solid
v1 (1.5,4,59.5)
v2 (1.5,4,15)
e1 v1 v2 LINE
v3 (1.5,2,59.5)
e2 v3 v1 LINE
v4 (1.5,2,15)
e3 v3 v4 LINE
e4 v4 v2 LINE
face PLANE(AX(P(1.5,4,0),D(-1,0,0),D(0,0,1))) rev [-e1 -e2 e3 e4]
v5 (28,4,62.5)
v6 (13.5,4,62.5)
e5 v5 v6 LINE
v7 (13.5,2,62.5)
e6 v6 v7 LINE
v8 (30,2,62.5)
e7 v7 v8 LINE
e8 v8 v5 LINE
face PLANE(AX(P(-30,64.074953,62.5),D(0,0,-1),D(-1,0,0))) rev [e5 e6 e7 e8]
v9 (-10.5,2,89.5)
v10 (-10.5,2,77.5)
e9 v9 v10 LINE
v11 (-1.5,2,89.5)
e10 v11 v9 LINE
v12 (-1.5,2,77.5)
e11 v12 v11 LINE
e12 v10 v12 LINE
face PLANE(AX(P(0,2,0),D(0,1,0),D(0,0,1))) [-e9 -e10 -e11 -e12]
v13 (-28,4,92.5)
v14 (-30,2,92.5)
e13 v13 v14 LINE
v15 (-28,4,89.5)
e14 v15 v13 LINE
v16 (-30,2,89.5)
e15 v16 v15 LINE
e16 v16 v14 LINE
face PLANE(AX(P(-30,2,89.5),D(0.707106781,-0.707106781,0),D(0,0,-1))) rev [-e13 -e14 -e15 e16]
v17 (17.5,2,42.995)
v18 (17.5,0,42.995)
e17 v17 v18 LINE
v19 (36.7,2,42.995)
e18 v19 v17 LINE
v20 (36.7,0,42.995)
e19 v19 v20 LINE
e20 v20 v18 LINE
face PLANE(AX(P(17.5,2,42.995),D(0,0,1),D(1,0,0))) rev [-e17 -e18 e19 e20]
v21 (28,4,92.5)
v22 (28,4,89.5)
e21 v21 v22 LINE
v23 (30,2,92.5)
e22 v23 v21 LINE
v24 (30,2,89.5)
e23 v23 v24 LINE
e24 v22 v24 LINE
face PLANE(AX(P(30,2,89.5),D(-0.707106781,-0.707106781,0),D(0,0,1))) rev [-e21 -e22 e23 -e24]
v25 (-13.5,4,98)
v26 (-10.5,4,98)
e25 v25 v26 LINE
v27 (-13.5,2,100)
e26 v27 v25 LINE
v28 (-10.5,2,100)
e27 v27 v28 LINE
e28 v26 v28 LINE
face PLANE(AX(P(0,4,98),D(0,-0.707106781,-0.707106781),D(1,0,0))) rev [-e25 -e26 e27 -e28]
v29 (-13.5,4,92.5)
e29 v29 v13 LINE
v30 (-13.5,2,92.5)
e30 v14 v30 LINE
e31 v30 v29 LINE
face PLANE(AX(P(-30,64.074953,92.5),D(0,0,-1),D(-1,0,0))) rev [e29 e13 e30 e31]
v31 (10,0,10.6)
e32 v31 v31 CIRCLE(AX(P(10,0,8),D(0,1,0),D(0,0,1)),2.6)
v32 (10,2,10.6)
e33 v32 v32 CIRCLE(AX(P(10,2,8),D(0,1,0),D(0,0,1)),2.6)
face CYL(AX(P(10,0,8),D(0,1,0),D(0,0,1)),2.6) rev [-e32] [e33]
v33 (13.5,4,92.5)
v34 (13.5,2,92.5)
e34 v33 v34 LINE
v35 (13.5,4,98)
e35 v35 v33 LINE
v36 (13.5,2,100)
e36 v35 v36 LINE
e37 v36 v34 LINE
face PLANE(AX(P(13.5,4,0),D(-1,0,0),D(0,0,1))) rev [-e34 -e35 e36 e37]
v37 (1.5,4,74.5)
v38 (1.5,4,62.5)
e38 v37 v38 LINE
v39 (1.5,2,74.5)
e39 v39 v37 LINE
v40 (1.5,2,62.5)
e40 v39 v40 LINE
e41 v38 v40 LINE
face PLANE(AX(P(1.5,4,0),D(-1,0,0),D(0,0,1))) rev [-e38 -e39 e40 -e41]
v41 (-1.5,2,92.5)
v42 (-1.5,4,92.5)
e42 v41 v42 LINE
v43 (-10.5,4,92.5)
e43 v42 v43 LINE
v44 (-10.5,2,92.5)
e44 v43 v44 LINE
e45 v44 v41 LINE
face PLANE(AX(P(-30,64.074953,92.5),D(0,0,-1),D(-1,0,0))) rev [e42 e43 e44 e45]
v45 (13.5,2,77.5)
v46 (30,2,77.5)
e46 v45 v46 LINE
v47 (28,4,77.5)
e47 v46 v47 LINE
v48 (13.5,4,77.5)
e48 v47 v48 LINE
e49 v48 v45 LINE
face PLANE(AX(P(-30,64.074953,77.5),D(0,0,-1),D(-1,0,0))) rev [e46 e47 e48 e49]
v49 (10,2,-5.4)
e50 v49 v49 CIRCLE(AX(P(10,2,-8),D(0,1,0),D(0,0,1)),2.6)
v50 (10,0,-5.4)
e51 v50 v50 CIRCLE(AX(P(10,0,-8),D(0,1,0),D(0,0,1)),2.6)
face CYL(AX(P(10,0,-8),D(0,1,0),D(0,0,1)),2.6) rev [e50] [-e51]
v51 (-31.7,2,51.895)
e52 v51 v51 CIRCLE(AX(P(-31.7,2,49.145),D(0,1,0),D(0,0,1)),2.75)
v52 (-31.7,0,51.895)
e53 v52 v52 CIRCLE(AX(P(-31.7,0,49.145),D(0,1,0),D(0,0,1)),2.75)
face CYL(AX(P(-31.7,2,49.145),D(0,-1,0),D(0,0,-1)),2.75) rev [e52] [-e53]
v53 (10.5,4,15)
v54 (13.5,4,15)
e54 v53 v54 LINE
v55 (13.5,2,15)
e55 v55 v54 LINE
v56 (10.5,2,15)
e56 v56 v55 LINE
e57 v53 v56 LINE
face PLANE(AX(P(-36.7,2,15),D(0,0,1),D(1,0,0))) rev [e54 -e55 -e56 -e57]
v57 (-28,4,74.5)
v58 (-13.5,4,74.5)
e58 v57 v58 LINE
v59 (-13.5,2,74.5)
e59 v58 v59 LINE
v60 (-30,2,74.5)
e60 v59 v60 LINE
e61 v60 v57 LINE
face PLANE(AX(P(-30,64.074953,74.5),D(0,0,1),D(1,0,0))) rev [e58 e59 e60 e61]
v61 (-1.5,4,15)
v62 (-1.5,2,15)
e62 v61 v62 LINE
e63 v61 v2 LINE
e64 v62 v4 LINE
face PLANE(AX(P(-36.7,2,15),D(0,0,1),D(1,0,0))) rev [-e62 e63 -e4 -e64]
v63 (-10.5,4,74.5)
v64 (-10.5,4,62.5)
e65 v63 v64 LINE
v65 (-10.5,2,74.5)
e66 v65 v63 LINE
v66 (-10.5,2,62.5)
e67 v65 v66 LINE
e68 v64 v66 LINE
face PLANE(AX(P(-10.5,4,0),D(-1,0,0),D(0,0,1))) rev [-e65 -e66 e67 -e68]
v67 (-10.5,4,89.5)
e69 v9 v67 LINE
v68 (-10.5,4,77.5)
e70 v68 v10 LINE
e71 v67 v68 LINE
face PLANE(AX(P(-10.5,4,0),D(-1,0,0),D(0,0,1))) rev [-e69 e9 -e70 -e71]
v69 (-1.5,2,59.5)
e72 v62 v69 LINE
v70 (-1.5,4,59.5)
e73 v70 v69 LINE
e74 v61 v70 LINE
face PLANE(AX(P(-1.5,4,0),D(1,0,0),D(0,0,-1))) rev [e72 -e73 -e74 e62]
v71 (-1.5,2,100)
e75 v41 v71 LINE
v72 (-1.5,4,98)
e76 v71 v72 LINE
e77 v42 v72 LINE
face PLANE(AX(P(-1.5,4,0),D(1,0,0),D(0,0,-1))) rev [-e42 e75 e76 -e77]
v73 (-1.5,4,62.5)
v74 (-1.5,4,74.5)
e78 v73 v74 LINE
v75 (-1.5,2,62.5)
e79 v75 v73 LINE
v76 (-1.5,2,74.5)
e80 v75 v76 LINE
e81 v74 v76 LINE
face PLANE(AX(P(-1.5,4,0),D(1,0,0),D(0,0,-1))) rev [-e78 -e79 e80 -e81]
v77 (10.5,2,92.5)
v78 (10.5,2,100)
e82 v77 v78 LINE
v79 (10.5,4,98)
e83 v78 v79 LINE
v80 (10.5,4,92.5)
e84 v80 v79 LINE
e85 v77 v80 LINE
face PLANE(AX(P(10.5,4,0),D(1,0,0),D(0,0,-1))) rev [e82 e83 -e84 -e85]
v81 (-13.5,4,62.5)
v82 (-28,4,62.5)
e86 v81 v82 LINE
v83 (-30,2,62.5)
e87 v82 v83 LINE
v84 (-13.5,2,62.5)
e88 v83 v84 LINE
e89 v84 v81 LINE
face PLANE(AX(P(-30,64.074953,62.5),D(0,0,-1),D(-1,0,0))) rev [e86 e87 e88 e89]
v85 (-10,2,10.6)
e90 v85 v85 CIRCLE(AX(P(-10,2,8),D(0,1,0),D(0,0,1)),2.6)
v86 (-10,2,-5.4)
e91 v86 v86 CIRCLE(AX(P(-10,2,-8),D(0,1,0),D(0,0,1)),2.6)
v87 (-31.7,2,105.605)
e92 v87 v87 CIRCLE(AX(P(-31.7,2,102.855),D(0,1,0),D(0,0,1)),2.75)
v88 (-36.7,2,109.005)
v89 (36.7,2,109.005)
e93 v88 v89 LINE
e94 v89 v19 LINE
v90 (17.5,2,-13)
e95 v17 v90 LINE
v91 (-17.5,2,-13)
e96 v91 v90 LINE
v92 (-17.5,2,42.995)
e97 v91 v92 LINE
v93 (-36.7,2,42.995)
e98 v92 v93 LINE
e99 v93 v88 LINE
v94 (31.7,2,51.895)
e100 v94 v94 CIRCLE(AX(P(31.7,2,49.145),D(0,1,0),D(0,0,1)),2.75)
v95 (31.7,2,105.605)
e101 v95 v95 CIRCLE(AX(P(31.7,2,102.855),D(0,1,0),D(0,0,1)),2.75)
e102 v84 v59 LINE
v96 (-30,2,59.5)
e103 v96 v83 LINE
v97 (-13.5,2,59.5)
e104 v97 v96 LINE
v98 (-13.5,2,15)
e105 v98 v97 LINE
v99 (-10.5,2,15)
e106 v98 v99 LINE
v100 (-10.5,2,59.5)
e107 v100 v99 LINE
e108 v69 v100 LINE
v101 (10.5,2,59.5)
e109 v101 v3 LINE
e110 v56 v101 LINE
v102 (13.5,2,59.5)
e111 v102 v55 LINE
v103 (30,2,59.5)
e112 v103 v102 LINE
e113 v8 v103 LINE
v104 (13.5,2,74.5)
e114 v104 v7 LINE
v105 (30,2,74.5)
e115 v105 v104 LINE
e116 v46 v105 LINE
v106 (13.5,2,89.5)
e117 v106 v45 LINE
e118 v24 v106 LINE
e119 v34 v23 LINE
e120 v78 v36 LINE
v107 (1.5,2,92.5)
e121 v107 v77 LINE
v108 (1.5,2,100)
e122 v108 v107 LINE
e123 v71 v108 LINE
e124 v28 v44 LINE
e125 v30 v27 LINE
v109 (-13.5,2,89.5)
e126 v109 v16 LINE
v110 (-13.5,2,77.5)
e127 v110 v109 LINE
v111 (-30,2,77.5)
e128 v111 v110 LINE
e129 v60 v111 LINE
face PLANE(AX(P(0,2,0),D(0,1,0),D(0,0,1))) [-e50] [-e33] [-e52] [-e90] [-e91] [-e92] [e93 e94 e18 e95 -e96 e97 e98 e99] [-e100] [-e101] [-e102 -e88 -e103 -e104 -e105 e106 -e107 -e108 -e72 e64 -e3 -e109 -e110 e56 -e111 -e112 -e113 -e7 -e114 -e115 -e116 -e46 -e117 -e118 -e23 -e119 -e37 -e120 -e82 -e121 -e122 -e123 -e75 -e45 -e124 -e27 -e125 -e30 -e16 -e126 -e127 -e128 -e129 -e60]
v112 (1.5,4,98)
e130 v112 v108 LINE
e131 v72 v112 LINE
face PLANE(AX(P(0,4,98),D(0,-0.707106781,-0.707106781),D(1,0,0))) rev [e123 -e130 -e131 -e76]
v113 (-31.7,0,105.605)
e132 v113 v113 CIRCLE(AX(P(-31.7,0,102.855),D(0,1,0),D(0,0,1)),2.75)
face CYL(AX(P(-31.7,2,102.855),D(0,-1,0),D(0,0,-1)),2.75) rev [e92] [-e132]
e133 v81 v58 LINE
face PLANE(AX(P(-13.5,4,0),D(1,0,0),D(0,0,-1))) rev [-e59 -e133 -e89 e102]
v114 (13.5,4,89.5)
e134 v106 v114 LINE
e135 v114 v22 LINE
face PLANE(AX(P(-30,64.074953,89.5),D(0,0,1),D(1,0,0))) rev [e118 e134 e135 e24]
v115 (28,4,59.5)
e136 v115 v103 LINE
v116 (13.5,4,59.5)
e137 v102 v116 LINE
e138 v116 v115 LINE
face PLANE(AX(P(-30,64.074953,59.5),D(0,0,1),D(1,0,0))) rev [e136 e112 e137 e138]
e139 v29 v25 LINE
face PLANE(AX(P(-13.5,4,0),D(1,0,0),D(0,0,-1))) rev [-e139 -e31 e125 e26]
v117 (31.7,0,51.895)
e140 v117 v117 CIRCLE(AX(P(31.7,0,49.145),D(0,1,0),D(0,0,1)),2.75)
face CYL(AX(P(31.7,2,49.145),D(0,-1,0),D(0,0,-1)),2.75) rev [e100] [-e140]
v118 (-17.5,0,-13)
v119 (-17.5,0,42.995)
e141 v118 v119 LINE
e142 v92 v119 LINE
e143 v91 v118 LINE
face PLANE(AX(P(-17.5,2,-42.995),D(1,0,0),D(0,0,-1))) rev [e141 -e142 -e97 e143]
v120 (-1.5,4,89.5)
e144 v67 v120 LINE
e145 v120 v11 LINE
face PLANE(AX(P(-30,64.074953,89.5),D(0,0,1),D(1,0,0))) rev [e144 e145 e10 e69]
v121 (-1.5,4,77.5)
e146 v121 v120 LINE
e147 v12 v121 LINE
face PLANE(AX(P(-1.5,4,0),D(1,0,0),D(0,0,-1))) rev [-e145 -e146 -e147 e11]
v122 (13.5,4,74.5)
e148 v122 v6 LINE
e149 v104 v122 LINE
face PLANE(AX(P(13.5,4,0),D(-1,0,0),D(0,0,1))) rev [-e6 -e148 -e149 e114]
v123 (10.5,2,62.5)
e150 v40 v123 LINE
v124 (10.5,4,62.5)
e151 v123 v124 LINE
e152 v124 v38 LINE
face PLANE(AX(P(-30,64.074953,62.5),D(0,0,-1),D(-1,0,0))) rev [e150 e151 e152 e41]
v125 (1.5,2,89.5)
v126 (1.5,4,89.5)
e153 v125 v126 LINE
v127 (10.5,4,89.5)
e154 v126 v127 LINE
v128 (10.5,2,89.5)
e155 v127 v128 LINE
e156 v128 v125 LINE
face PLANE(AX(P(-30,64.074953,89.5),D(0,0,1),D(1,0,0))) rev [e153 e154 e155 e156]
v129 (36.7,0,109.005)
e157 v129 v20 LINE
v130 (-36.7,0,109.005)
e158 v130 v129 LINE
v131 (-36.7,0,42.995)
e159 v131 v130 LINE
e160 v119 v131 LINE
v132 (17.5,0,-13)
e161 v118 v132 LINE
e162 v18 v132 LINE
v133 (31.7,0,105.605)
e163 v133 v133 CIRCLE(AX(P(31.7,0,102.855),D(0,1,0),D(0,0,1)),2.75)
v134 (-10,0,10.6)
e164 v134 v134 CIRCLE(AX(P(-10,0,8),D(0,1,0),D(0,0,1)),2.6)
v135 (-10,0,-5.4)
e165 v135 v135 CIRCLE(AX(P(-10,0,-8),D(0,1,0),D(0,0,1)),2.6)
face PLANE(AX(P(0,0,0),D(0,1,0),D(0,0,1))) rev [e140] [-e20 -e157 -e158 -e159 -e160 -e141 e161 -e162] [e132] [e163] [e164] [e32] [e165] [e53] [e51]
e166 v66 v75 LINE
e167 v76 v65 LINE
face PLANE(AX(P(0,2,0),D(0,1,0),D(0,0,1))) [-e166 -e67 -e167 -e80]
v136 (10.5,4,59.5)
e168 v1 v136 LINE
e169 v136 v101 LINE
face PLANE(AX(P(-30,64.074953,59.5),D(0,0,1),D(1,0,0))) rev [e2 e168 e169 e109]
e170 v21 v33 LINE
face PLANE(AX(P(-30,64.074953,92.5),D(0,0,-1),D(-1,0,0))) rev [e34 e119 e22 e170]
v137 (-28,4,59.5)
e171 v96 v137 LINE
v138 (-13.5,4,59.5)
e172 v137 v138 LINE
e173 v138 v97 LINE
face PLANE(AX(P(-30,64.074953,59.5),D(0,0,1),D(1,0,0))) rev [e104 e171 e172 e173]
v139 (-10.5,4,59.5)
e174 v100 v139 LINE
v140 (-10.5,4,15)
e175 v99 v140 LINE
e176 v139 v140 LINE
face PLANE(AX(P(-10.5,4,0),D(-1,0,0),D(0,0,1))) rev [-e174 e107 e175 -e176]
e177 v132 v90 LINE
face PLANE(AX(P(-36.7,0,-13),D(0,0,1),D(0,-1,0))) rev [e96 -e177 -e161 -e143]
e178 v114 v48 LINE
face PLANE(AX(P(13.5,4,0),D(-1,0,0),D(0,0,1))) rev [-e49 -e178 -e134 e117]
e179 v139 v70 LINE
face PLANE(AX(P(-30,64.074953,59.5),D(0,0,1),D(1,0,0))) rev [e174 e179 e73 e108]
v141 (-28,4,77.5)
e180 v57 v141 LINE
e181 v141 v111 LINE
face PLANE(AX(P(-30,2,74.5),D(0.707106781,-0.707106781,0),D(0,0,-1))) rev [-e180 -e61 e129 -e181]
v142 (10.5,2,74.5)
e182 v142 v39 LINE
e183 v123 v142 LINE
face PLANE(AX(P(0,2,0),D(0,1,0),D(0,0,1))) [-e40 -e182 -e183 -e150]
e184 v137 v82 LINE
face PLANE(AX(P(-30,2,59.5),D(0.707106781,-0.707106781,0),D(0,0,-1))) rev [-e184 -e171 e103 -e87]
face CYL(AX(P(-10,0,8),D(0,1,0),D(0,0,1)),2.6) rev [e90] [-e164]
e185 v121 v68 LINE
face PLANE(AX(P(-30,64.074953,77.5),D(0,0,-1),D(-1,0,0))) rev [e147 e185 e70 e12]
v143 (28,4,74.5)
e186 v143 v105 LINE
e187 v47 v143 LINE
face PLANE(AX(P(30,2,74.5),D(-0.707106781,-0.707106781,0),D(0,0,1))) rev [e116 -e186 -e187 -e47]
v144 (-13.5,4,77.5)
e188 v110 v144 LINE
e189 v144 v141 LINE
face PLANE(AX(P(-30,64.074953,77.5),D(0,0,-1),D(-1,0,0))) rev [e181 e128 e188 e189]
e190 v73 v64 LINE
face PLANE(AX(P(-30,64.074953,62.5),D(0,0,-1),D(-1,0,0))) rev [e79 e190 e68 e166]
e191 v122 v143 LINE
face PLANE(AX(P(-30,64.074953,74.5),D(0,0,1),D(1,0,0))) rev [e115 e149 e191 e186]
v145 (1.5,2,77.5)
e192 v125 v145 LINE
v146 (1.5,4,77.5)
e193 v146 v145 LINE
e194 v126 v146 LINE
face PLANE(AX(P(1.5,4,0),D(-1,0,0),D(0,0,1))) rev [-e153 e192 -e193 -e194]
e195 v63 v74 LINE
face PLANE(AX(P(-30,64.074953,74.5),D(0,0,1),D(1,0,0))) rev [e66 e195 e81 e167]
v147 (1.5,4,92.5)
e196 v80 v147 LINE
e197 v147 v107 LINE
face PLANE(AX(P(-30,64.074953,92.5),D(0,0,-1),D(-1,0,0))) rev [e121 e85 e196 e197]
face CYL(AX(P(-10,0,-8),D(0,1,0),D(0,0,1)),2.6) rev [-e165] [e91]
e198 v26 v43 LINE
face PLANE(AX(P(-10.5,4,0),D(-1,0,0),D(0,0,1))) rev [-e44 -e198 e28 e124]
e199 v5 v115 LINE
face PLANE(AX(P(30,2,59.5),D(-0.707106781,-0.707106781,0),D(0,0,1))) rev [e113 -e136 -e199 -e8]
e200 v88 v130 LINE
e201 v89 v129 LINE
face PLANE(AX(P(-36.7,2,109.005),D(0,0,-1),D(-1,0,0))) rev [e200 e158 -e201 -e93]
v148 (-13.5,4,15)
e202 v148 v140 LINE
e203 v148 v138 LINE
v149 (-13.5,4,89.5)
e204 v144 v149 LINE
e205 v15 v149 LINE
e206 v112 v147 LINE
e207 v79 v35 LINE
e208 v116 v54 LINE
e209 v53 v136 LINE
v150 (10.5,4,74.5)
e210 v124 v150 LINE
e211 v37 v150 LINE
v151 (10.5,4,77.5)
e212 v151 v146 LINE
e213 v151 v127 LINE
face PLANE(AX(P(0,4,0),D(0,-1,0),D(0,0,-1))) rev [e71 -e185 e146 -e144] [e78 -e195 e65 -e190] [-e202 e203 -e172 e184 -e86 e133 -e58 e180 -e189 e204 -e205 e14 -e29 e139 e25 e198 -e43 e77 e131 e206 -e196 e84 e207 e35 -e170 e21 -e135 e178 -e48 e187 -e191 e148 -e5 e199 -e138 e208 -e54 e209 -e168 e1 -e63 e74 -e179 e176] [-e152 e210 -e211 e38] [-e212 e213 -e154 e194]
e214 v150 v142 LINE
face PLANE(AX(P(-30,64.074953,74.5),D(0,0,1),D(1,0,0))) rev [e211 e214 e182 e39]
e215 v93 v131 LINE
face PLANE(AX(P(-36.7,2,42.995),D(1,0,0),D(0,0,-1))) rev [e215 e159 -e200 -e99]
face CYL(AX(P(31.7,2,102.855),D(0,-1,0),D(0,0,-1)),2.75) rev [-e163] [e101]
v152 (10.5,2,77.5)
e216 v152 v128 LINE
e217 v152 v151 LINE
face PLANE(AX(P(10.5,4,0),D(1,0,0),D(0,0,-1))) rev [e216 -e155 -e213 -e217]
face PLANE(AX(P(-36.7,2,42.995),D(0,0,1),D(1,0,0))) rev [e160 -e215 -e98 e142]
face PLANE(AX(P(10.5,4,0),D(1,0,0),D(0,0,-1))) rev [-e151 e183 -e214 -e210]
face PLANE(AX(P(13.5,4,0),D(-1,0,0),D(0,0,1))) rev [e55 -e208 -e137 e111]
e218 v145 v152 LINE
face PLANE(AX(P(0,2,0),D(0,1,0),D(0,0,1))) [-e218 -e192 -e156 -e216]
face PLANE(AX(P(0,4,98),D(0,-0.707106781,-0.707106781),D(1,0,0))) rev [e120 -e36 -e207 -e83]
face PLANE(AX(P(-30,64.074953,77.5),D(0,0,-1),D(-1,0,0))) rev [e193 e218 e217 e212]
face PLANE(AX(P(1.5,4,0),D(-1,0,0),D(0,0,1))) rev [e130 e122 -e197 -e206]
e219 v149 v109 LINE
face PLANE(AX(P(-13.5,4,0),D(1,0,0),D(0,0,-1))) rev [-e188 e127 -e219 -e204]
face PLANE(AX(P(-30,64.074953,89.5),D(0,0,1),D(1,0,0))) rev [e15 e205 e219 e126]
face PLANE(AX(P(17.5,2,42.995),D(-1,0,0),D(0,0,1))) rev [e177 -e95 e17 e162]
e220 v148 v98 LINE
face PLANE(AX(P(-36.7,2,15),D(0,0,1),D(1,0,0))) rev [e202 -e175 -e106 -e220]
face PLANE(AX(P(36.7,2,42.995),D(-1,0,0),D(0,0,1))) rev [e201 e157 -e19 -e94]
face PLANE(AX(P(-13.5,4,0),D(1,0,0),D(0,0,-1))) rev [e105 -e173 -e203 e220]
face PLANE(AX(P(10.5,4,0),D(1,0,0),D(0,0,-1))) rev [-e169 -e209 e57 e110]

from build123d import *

# Parameters (mm, degrees)
SKETCH1_R                = 2.75
BOSS_EXTRUDE1_DEPTH      = 2
SKETCH2_W                = 3
SKETCH2_H                = 100
BOSS_EXTRUDE2_DEPTH      = 2
SKETCH3_W                = 60
SKETCH3_H                = 3
BOSS_EXTRUDE3_DEPTH      = 2
CHAMFER1_SIZE            = 2
CHAMFER1_OF_MIRROR1_SIZE = 2
CUT_EXTRUDE2_DEPTH       = 122.80201158
CUT_EXTRUDE2_DEPTH_BACK  = 122.80201158
CUT_EXTRUDE3_DEPTH       = 116.034690529
CUT_EXTRUDE3_DEPTH_BACK  = 116.034690529
SKETCH5_R                = 2.6


with BuildPart() as part:
    # Sketch1 → Boss-Extrude1 (new body)
    with BuildSketch(Plane(origin=(0, 0, 0), x_dir=(1, 0, 0), z_dir=(0, 1, 0))):
        Polygon((-17.5, 42.995), (-17.5, -42.995), (-36.7, -42.995), (-36.7, -109.005), (36.7, -109.005), (36.7, -42.995), (17.5, -42.995), (17.5, 42.995), (36.7, 42.995), (36.7, 109.005), (-36.7, 109.005), (-36.7, 42.995), align=None)
        with Locations(Location((-31.7, 102.855, 0), (0, 0, 270))):
            Circle(SKETCH1_R, mode=Mode.SUBTRACT)
        with Locations(Location((-31.7, 49.145, 0), (0, 0, 270))):
            Circle(SKETCH1_R, mode=Mode.SUBTRACT)
        with Locations(Location((31.7, 49.145, 0), (0, 0, 270))):
            Circle(SKETCH1_R, mode=Mode.SUBTRACT)
        with Locations(Location((31.7, 102.855, 0), (0, 0, 270))):
            Circle(SKETCH1_R, mode=Mode.SUBTRACT)
        with Locations(Location((31.7, -102.855, 0), (0, 0, 270))):
            Circle(SKETCH1_R, mode=Mode.SUBTRACT)
        with Locations(Location((31.7, -49.145, 0), (0, 0, 270))):
            Circle(SKETCH1_R, mode=Mode.SUBTRACT)
        with Locations(Location((-31.7, -49.145, 0), (0, 0, 270))):
            Circle(SKETCH1_R, mode=Mode.SUBTRACT)
        with Locations(Location((-31.7, -102.855, 0), (0, 0, 270))):
            Circle(SKETCH1_R, mode=Mode.SUBTRACT)
    extrude(amount=BOSS_EXTRUDE1_DEPTH)

    # Sketch2 → Boss-Extrude2 (add)
    with BuildSketch(Plane(origin=(0, 2, 0), x_dir=(1, 0, 0), z_dir=(0, 1, 0))):
        with Locations((12, -50)):
            Rectangle(SKETCH2_W, SKETCH2_H)
        with Locations((0, -50)):
            Rectangle(SKETCH2_W, SKETCH2_H)
        with Locations((-12, -50)):
            Rectangle(SKETCH2_W, SKETCH2_H)
    boss_extrude2 = extrude(amount=BOSS_EXTRUDE2_DEPTH)

    # Sketch3 → Boss-Extrude3 (add)
    with BuildSketch(Plane(origin=(0, 2, 0), x_dir=(1, 0, 0), z_dir=(0, 1, 0))):
        with Locations((0, -91)):
            Rectangle(SKETCH3_W, SKETCH3_H)
        with Locations((0, -61)):
            Rectangle(SKETCH3_W, SKETCH3_H)
        with Locations((0, -76)):
            Rectangle(SKETCH3_W, SKETCH3_H)
    boss_extrude3 = extrude(amount=BOSS_EXTRUDE3_DEPTH)

    # Chamfer1
    chamfer1_edges = [part.edges().sort_by_distance(p)[0] for p in [
        (30, 4, 61),
        (30, 4, 76),
        (30, 4, 91),
        (12, 4, 100),
        (0, 4, 100),
        (-12, 4, 100),
        (-30, 4, 91),
        (-30, 4, 76),
        (-30, 4, 61),
    ]]
    chamfer(chamfer1_edges, length=CHAMFER1_SIZE - 0.0001)  # a hair under: the kernel refuses the full size

    # Mirror1: Boss-Extrude2, Boss-Extrude3 across plane
    add(boss_extrude2.mirror(Plane.XY))
    add(boss_extrude3.mirror(Plane.XY))

    # Chamfer1 of Mirror1
    chamfer1_of_mirror1_edges = [part.edges().sort_by_distance(p)[0] for p in [
        (30, 4, -61),
        (30, 4, -76),
        (30, 4, -91),
        (12, 4, -100),
        (0, 4, -100),
        (-12, 4, -100),
        (-30, 4, -91),
        (-30, 4, -76),
        (-30, 4, -61),
    ]]
    chamfer(chamfer1_of_mirror1_edges, length=CHAMFER1_OF_MIRROR1_SIZE - 0.0001)  # a hair under: the kernel refuses the full size

    # Sketch4 → Cut-Extrude2 (cut, two sides: drawn at the far end of the back side and taken through both)
    with BuildSketch(Plane(origin=(17.5, 0, 0), x_dir=(0, 0, -1), z_dir=(1, 0, 0)).offset(-CUT_EXTRUDE2_DEPTH_BACK)):
        Polygon((13, 0), (13, 2), (-15, 2), (-15, 4), (109.005, 4), (109.005, 0), align=None)
    extrude(amount=CUT_EXTRUDE2_DEPTH + CUT_EXTRUDE2_DEPTH_BACK, mode=Mode.SUBTRACT)

    # Sketch5 → Cut-Extrude3 (cut, two sides: drawn at the far end of the back side and taken through both)
    with BuildSketch(Plane(origin=(0, 2, 0), x_dir=(1, 0, 0), z_dir=(0, 1, 0)).offset(-CUT_EXTRUDE3_DEPTH_BACK)):
        with Locations(Location((10, -8, 0), (0, 0, 270))):
            Circle(SKETCH5_R)
        with Locations(Location((10, 8, 0), (0, 0, 270))):
            Circle(SKETCH5_R)
        with Locations(Location((-10, 8, 0), (0, 0, 270))):
            Circle(SKETCH5_R)
        with Locations(Location((-10, -8, 0), (0, 0, 270))):
            Circle(SKETCH5_R)
    extrude(amount=CUT_EXTRUDE3_DEPTH + CUT_EXTRUDE3_DEPTH_BACK, mode=Mode.SUBTRACT)


solid = part.part
